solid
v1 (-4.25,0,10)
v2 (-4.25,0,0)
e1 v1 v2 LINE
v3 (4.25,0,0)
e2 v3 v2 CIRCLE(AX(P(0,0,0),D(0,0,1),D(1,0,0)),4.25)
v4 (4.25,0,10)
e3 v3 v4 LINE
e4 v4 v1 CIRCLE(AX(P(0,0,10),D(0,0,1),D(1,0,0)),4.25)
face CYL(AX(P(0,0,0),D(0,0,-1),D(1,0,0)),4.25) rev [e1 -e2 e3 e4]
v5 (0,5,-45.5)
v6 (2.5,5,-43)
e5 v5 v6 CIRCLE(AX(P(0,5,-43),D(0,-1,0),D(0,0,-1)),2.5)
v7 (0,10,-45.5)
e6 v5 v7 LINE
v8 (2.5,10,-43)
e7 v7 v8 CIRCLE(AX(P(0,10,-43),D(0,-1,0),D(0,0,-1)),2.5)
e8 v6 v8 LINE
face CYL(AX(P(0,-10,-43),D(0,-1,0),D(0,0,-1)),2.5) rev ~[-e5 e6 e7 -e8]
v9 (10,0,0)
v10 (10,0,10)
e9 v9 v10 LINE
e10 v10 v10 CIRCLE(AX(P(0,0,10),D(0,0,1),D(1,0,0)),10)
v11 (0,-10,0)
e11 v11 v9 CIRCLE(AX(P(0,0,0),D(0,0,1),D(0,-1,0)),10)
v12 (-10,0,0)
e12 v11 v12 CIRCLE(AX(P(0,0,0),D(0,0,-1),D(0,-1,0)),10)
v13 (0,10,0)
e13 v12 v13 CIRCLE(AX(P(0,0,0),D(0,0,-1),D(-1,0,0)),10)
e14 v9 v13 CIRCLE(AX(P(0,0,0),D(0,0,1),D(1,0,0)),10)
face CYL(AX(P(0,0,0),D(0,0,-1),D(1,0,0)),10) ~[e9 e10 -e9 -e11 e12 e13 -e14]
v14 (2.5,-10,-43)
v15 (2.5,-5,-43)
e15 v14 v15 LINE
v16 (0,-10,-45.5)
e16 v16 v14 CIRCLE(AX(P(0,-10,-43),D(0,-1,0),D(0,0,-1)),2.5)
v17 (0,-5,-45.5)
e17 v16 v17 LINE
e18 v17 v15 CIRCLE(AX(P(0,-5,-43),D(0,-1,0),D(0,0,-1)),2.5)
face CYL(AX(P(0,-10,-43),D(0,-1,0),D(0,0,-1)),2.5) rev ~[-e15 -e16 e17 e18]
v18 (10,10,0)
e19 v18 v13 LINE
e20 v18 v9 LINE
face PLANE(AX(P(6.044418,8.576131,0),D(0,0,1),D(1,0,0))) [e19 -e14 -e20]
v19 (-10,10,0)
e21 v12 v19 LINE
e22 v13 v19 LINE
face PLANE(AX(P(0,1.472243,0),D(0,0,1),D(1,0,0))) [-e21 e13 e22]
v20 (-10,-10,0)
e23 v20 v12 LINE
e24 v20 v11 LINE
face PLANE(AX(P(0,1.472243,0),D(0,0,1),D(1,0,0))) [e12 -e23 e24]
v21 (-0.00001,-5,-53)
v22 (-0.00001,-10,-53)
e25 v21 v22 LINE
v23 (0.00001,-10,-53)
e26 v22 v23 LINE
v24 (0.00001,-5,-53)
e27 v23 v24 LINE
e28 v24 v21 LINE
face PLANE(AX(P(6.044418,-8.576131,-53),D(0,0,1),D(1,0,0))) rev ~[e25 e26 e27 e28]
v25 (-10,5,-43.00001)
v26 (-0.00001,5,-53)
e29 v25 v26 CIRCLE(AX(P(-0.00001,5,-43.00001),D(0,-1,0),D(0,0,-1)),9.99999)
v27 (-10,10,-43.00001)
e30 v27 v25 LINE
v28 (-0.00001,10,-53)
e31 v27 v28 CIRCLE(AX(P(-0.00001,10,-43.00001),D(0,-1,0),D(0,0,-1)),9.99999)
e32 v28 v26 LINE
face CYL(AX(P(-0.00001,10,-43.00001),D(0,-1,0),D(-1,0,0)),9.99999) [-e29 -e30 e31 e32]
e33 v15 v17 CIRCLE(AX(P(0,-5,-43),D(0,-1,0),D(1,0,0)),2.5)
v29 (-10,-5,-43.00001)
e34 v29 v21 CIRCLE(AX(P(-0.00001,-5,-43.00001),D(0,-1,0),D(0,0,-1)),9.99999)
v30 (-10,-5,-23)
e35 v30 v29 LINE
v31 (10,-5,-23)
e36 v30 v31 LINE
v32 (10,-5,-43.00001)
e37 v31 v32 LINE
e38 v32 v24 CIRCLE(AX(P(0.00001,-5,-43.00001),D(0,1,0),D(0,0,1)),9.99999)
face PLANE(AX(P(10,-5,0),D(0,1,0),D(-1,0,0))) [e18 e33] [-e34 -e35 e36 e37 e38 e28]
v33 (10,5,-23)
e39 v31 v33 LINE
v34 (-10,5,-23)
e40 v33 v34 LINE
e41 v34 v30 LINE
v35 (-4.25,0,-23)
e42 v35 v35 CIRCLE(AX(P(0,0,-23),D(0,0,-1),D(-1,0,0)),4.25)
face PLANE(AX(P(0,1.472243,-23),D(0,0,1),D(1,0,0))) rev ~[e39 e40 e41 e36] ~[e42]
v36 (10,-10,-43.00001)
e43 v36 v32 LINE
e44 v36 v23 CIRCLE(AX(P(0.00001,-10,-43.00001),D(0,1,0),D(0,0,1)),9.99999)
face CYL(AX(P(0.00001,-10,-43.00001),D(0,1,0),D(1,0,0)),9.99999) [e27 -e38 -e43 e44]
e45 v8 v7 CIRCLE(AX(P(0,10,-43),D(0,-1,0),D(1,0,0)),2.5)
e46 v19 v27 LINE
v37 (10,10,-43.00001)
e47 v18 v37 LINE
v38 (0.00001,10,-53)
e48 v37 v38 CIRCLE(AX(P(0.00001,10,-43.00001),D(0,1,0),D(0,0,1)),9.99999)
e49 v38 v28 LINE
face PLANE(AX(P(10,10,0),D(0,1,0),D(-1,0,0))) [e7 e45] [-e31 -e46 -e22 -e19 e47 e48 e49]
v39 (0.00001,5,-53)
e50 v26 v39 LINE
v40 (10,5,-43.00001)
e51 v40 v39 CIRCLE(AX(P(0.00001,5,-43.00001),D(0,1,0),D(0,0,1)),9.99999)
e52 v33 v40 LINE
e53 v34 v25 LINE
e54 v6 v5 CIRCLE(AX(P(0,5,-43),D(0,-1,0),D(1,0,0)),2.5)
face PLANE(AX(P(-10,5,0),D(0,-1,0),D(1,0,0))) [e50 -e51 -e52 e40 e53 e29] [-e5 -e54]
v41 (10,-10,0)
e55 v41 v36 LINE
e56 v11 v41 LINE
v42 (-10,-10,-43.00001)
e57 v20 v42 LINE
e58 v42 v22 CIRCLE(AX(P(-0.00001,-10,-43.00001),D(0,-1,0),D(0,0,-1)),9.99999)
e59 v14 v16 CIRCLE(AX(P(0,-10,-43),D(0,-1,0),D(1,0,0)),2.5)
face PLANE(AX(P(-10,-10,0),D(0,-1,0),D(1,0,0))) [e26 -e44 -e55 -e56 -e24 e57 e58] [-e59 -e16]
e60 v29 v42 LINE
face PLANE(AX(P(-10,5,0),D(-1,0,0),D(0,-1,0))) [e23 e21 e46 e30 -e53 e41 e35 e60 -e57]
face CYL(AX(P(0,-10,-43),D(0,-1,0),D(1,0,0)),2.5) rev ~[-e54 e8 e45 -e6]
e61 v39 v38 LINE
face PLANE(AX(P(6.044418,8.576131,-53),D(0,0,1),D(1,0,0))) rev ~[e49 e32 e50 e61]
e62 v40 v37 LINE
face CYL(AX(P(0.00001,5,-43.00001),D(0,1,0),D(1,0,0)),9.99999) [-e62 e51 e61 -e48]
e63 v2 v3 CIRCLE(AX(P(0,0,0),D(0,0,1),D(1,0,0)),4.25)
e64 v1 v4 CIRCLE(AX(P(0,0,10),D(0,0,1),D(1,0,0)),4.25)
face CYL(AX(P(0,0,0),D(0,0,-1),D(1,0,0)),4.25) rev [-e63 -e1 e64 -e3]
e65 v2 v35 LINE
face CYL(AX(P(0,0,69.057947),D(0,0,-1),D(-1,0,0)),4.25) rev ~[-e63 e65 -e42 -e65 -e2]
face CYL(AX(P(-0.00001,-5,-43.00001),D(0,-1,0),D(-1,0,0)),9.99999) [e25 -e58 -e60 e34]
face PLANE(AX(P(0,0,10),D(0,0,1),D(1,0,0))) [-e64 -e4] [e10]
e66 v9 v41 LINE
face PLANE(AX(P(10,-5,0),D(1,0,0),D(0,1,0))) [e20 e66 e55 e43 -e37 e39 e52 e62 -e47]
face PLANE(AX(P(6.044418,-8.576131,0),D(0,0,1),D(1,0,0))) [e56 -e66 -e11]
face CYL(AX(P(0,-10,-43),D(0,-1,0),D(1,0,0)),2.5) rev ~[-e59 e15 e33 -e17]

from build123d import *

# Parameters (mm, degrees)
F0_R     = 10
F0_R_2   = 4.25
F1_DEPTH = 10
F3_DEPTH = 53
F5_DEPTH = 25
F6_DEPTH = 23
F7_R     = 9.99999
F8_D     = 8.5


# Not quite as in the source:
# - a fillet or chamfer is up to 0.001 mm smaller than in the source, because OpenCascade refuses the exact size
# - a feature names something its author has since deleted; it is built from what else it names


with BuildPart() as f1:
    # F0 (on Top) → F1 (new body)
    with BuildSketch(Plane.XY):
        Circle(F0_R)
        Circle(F0_R_2, mode=Mode.SUBTRACT)
    extrude(amount=F1_DEPTH)

    # F2 (on face) → F3 (join)
    with BuildSketch(Plane.XY):
        with BuildLine():
            ThreePointArc((8.6602540378, -5), (5, -8.6602540378), (0, -10))
            Line((0, -10), (10, -10))
            Line((10, -10), (10, -5))
            Line((10, -5), (8.6602540378, -5))
        make_face()
        with BuildLine():
            ThreePointArc((-8.6602540378, -5), (-5, -8.6602540378), (0, -10))
            ThreePointArc((0, -10), (5, -8.6602540378), (8.6602540378, -5))
            Line((8.6602540378, -5), (-8.6602540378, -5))
        make_face()
        with BuildLine():
            Line((-10, -10), (0, -10))
            ThreePointArc((0, -10), (-5, -8.6602540378), (-8.6602540378, -5))
            Line((-8.6602540378, -5), (-10, -5))
            Line((-10, -5), (-10, -10))
        make_face()
        with BuildLine():
            Line((8.6602540378, 5), (10, 5))
            Line((10, 5), (10, 10))
            Line((10, 10), (-2.67e-08, 10))
            ThreePointArc((-2.67e-08, 10), (4.9999999884, 8.6602540445), (8.6602540378, 5))
        make_face()
        with BuildLine():
            Line((-10, 10), (-10, 5))
            Line((-10, 5), (-8.6602540378, 5))
            ThreePointArc((-8.6602540378, 5), (-5.0000000116, 8.6602540312), (-2.67e-08, 10))
            Line((-2.67e-08, 10), (-10, 10))
        make_face()
        with BuildLine():
            ThreePointArc((-2.67e-08, 10), (-5.0000000116, 8.6602540312), (-8.6602540378, 5))
            Line((-8.6602540378, 5), (8.6602540378, 5))
            ThreePointArc((8.6602540378, 5), (4.9999999884, 8.6602540445), (-2.67e-08, 10))
        make_face()
    extrude(amount=-F3_DEPTH)

    # F4 (on face) → F5 (cut)
    with BuildSketch(Plane.XZ.offset(10)):
        with BuildLine():
            ThreePointArc((2.5, -43), (-1.767766953, -41.232233047), (0, -45.5))
            ThreePointArc((0, -45.5), (1.767766953, -44.767766953), (2.5, -43))
        make_face()
    extrude(amount=-F5_DEPTH, mode=Mode.SUBTRACT)

    # F2 (on face) → F6 (join)
    with BuildSketch(Plane.XY):
        with BuildLine():
            ThreePointArc((4.25, 0), (0, 4.25), (-4.25, 0))
            Line((-4.25, 0), (4.25, 0))
        make_face()
        with BuildLine():
            ThreePointArc((-10, 0), (-9.6592582629, -2.588190451), (-8.6602540378, -5))
            Line((-8.6602540378, -5), (8.6602540378, -5))
            ThreePointArc((8.6602540378, -5), (9.6592582629, -2.588190451), (10, 0))
            Line((10, 0), (4.25, 0))
            ThreePointArc((4.25, 0), (0, -4.25), (-4.25, 0))
            Line((-4.25, 0), (-10, 0))
        make_face()
        with BuildLine():
            ThreePointArc((-8.6602540378, 5), (-9.6592582629, 2.588190451), (-10, 0))
            Line((-10, 0), (-4.25, 0))
            ThreePointArc((-4.25, 0), (0, 4.25), (4.25, 0))
            Line((4.25, 0), (10, 0))
            ThreePointArc((10, 0), (9.6592582629, 2.588190451), (8.6602540378, 5))
            Line((8.6602540378, 5), (-8.6602540378, 5))
        make_face()
        with BuildLine():
            Line((-10, 5), (-10, 0))
            ThreePointArc((-10, 0), (-9.6592582629, 2.588190451), (-8.6602540378, 5))
            Line((-8.6602540378, 5), (-10, 5))
        make_face()
        with BuildLine():
            Line((-10, -5), (-8.6602540378, -5))
            ThreePointArc((-8.6602540378, -5), (-9.6592582629, -2.588190451), (-10, 0))
            Line((-10, 0), (-10, -5))
        make_face()
        with BuildLine():
            ThreePointArc((8.6602540378, 5), (9.6592582629, 2.588190451), (10, 0))
            Line((10, 0), (10, 5))
            Line((10, 5), (8.6602540378, 5))
        make_face()
        with BuildLine():
            ThreePointArc((10, 0), (9.6592582629, -2.588190451), (8.6602540378, -5))
            Line((8.6602540378, -5), (10, -5))
            Line((10, -5), (10, 0))
        make_face()
        with BuildLine():
            Line((4.25, 0), (-4.25, 0))
            ThreePointArc((-4.25, 0), (0, -4.25), (4.25, 0))
        make_face()
    extrude(amount=-F6_DEPTH)

    # F7 (radius 10 in the source; OpenCascade refuses exactly that, so slightly less here)
    f7_edges = [f1.edges().sort_by_distance(p)[0] for p in [
        (-10, -7.5, -53),
        (-10, 7.5, -53),
        (10, 7.5, -53),
        (10, -7.5, -53),
    ]]
    fillet(f7_edges, radius=F7_R)

    # F8 (through all)
    with Locations(Plane.XY):
        with Locations((0, 0)):
            Hole(F8_D / 2)


solid = f1.part
